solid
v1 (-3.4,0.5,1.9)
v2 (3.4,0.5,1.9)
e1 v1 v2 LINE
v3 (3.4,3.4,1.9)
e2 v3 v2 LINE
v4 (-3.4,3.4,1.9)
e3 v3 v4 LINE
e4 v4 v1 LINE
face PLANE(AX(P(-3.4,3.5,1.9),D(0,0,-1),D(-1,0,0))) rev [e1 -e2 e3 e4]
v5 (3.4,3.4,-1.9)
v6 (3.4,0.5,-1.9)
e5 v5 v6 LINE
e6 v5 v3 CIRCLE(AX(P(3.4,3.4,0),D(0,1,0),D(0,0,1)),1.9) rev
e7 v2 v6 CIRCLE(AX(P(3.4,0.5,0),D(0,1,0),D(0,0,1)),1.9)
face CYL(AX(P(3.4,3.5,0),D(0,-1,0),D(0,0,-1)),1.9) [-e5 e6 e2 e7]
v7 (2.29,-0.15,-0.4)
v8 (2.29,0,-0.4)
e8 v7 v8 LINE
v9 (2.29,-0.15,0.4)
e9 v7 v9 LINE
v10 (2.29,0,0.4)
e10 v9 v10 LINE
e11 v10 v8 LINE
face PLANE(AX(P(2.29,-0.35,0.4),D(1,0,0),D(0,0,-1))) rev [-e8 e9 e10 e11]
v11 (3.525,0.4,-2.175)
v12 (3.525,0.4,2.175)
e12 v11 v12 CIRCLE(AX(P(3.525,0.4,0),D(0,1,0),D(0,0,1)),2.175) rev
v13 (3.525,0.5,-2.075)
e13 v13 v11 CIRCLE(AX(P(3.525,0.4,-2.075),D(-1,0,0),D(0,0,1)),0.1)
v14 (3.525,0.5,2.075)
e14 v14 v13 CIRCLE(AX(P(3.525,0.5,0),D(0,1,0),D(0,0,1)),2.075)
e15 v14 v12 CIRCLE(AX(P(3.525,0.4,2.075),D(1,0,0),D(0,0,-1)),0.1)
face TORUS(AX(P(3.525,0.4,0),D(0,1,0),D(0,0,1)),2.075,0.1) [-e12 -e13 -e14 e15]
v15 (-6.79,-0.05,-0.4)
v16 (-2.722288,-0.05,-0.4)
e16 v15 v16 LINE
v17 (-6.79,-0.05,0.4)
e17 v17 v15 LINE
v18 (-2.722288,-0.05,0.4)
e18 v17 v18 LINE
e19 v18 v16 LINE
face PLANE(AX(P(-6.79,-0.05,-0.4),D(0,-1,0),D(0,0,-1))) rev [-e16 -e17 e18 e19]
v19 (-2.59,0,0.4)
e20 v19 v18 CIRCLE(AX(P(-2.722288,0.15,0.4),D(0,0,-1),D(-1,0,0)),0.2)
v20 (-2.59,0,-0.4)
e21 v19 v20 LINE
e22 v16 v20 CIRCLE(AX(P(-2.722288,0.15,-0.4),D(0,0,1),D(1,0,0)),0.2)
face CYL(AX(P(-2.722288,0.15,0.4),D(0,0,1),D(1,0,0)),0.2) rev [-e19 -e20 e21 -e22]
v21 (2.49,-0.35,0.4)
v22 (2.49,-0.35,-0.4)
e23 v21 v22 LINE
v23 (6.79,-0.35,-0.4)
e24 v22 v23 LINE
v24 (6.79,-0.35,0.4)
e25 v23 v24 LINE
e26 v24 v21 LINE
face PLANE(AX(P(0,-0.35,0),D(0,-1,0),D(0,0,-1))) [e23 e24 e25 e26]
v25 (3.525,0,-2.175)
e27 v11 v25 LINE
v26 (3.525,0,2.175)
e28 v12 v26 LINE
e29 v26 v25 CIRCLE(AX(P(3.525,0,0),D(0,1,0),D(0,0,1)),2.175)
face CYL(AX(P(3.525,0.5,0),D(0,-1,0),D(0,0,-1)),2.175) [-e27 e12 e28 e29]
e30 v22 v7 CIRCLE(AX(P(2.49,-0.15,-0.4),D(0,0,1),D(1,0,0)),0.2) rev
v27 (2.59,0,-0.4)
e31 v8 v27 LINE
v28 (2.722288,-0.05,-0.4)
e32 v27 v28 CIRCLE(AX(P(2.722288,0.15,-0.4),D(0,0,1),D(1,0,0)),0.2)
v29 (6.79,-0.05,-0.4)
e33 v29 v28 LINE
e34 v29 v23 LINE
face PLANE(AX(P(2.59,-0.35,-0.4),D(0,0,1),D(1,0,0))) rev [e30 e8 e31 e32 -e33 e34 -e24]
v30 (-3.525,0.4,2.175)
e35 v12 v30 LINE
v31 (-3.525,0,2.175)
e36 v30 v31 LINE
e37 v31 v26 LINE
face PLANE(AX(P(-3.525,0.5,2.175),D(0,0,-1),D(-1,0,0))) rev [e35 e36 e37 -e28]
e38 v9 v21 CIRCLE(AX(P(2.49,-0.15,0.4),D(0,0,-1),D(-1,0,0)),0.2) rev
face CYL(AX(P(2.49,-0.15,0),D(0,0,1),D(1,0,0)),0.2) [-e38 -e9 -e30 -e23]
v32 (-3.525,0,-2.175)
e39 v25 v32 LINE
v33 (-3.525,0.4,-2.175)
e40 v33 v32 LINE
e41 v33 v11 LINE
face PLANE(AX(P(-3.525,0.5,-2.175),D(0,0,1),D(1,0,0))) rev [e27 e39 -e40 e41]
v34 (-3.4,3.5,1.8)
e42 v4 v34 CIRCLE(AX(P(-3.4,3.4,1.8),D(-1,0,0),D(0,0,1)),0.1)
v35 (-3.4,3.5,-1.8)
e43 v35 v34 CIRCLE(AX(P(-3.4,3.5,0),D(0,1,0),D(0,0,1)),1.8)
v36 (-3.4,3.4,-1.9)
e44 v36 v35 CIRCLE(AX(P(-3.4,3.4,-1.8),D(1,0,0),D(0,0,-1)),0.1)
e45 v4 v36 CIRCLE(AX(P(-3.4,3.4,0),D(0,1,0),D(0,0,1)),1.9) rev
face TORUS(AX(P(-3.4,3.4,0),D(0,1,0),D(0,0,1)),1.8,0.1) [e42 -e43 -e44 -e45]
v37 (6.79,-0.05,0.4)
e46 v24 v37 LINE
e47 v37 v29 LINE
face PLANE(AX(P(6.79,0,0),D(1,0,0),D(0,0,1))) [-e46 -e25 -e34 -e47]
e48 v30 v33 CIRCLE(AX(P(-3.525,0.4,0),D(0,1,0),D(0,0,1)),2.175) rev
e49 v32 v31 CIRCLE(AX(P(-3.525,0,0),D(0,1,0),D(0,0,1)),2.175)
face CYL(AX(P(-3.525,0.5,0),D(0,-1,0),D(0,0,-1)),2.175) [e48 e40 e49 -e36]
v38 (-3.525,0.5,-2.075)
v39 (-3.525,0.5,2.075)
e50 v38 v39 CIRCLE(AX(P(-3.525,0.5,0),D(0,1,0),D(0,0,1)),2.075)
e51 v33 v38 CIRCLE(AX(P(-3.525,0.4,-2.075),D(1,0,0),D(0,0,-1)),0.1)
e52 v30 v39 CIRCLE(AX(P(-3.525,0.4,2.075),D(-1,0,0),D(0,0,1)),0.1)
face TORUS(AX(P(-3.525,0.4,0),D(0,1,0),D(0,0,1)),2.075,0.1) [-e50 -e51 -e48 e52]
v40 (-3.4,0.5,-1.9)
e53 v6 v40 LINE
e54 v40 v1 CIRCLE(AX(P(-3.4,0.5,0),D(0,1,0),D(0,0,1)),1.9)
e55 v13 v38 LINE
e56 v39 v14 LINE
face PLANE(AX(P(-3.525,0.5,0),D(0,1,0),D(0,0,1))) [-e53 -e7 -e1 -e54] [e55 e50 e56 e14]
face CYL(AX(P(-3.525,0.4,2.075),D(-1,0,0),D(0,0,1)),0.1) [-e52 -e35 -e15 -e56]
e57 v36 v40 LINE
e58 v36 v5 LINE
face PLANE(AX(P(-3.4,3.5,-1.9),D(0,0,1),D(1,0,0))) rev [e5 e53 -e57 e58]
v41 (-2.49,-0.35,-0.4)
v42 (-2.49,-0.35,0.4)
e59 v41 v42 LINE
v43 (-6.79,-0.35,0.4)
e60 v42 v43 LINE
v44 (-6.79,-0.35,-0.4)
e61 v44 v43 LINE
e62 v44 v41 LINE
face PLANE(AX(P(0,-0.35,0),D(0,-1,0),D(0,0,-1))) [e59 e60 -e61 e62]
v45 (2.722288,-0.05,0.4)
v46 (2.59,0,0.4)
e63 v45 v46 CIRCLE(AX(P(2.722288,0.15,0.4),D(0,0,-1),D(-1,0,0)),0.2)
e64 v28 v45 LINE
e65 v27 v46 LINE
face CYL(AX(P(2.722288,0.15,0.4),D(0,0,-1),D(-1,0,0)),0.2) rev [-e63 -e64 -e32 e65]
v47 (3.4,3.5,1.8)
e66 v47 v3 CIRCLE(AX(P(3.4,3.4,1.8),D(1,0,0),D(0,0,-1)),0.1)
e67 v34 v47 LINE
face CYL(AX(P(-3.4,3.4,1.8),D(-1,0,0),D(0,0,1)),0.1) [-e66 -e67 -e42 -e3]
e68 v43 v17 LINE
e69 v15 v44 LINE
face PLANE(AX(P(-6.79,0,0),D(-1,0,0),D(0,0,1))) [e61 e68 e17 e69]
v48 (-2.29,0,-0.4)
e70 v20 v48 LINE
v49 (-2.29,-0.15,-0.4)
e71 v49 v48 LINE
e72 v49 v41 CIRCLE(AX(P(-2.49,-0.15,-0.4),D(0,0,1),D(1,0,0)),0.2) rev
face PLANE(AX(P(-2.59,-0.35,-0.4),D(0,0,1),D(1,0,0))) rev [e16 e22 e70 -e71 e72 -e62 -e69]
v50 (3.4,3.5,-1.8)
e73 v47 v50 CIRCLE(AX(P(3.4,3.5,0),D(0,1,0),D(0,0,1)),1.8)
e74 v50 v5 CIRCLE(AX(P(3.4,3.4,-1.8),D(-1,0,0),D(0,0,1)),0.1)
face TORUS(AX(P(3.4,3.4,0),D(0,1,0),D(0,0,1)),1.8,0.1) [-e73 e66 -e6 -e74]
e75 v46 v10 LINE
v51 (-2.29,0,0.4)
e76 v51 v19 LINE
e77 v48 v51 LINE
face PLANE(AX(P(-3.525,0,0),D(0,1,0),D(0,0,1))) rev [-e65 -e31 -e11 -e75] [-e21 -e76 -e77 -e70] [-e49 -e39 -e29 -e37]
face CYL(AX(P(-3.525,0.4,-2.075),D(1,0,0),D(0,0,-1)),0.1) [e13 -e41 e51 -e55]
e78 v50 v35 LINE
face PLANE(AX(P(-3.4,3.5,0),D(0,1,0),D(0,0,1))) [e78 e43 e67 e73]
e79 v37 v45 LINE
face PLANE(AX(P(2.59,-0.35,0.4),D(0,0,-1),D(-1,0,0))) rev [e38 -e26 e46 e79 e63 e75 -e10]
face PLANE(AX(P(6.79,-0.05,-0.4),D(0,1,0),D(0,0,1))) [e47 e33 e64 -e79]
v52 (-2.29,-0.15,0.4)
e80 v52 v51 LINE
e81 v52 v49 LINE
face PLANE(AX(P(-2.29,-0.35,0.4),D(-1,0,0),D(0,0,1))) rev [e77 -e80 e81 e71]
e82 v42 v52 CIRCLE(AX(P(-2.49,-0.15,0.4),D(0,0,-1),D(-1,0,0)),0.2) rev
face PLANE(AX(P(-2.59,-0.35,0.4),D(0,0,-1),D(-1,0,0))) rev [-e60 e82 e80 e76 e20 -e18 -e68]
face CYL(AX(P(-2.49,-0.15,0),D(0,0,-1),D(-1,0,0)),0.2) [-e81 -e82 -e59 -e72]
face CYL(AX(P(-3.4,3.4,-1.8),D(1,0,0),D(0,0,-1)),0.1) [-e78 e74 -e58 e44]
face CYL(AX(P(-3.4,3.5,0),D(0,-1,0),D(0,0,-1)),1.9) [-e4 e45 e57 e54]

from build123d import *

# Parameters (mm, degrees)
BOSS_EXTRUDE1_DEPTH = 0.5
FILLET1_R           = 0.1
BOSS_EXTRUDE2_DEPTH = 3
FILLET2_R           = 0.1
SKETCH4_W           = 0.3
SKETCH4_H           = 0.8
BOSS_EXTRUDE3_DEPTH = 0.35
SKETCH5_W           = 0.8
SKETCH5_H           = 0.3
BOSS_EXTRUDE4_DEPTH = 4.2
FILLET3_R           = 0.2


with BuildPart() as part:
    # Sketch1 → Boss-Extrude1 (new body)
    with BuildSketch(Plane(origin=(0, 0, 0), x_dir=(1, 0, 0), z_dir=(0, 1, 0))):
        with BuildLine():
            Line((-3.525, 2.175), (3.525, 2.175))
            ThreePointArc((3.525, 2.175), (5.7, 0), (3.525, -2.175))
            Line((3.525, -2.175), (-3.525, -2.175))
            ThreePointArc((-3.525, -2.175), (-5.7, 0), (-3.525, 2.175))
        make_face()
    extrude(amount=BOSS_EXTRUDE1_DEPTH)

    # Fillet1
    fillet1_edges = [part.edges().sort_by_distance(p)[0] for p in [
        (5.7, 0.5, 0),
        (0, 0.5, -2.175),
        (-5.7, 0.5, 0),
        (0, 0.5, 2.175),
    ]]
    fillet(fillet1_edges, radius=FILLET1_R)

    # Sketch2 → Boss-Extrude2 (add)
    with BuildSketch(Plane(origin=(0, 0.5, 0), x_dir=(1, 0, 0), z_dir=(0, 1, 0))):
        with BuildLine():
            Line((-3.4, 1.9), (3.4, 1.9))
            ThreePointArc((3.4, 1.9), (5.3, 0), (3.4, -1.9))
            Line((3.4, -1.9), (-3.4, -1.9))
            ThreePointArc((-3.4, -1.9), (-5.3, 0), (-3.4, 1.9))
        make_face()
    extrude(amount=BOSS_EXTRUDE2_DEPTH)

    # Fillet2
    fillet2_edges = [part.edges().sort_by_distance(p)[0] for p in [
        (-5.3, 3.5, 0),
        (0, 3.5, 1.9),
        (5.3, 3.5, 0),
        (0, 3.5, -1.9),
    ]]
    fillet(fillet2_edges, radius=FILLET2_R)

    # Sketch4 → Boss-Extrude3 (add)
    with BuildSketch(Plane.XZ):
        with Locations((2.44, 0)):
            Rectangle(SKETCH4_W, SKETCH4_H)
        with Locations((-2.44, 0)):
            Rectangle(SKETCH4_W, SKETCH4_H)
    extrude(amount=BOSS_EXTRUDE3_DEPTH)

    # Sketch5 → Boss-Extrude4 (add)
    with BuildSketch(Plane.ZY.offset(2.59)):
        with Locations((0, -0.2)):
            Rectangle(SKETCH5_W, SKETCH5_H)
    boss_extrude4 = extrude(amount=BOSS_EXTRUDE4_DEPTH)

    # Mirror1: Boss-Extrude4 across plane
    add(boss_extrude4.mirror(Plane(origin=(0, 0, 0), x_dir=(0, 0, 1), z_dir=(1, 0, 0))))

    # Fillet3
    # the kernel refuses this fillet: 0.2 mm, written as the material it adds along each edge
    with BuildSketch(Plane(origin=(-2.59, -0.05, -0.4), x_dir=(-1, 0, 0), z_dir=(0, 0, 1))) as fillet3_piece_1:
        with BuildLine():
            CenterArc((0.132287566, -0.2), FILLET3_R, 90, 41.409622109)
            Line((0, -0.05), (0, 0))
            Line((0, 0), (0.132287566, 0))
        make_face()
    extrude(amount=0.8)
    with BuildSketch(Plane(origin=(2.59, -0.05, -0.4), x_dir=(0, 1, 0), z_dir=(0, 0, 1))) as fillet3_piece_2:
        with BuildLine():
            CenterArc((0.2, -0.132287566), FILLET3_R, 138.590377891, 41.409622109)
            Line((0, -0.132287566), (0, 0))
            Line((0, 0), (0.05, 0))
        make_face()
    extrude(amount=0.8)
    # the kernel refuses this fillet: 0.2 mm, written as the material it takes off along each edge
    with BuildSketch(Plane(origin=(2.29, -0.35, -0.9), x_dir=(0, 1, 0), z_dir=(0, 0, 1)), Plane(origin=(-2.29, -0.35, 0.9), x_dir=(0, 1, 0), z_dir=(0, 0, -1))) as fillet3_2_piece_1:
        with BuildLine():
            CenterArc((FILLET3_R, -FILLET3_R), FILLET3_R, 90, 90)
            Line((0, -FILLET3_R), (0, 0))
            Line((0, 0), (FILLET3_R, 0))
        make_face()
    extrude(amount=1.8, mode=Mode.SUBTRACT)


solid = part.part
